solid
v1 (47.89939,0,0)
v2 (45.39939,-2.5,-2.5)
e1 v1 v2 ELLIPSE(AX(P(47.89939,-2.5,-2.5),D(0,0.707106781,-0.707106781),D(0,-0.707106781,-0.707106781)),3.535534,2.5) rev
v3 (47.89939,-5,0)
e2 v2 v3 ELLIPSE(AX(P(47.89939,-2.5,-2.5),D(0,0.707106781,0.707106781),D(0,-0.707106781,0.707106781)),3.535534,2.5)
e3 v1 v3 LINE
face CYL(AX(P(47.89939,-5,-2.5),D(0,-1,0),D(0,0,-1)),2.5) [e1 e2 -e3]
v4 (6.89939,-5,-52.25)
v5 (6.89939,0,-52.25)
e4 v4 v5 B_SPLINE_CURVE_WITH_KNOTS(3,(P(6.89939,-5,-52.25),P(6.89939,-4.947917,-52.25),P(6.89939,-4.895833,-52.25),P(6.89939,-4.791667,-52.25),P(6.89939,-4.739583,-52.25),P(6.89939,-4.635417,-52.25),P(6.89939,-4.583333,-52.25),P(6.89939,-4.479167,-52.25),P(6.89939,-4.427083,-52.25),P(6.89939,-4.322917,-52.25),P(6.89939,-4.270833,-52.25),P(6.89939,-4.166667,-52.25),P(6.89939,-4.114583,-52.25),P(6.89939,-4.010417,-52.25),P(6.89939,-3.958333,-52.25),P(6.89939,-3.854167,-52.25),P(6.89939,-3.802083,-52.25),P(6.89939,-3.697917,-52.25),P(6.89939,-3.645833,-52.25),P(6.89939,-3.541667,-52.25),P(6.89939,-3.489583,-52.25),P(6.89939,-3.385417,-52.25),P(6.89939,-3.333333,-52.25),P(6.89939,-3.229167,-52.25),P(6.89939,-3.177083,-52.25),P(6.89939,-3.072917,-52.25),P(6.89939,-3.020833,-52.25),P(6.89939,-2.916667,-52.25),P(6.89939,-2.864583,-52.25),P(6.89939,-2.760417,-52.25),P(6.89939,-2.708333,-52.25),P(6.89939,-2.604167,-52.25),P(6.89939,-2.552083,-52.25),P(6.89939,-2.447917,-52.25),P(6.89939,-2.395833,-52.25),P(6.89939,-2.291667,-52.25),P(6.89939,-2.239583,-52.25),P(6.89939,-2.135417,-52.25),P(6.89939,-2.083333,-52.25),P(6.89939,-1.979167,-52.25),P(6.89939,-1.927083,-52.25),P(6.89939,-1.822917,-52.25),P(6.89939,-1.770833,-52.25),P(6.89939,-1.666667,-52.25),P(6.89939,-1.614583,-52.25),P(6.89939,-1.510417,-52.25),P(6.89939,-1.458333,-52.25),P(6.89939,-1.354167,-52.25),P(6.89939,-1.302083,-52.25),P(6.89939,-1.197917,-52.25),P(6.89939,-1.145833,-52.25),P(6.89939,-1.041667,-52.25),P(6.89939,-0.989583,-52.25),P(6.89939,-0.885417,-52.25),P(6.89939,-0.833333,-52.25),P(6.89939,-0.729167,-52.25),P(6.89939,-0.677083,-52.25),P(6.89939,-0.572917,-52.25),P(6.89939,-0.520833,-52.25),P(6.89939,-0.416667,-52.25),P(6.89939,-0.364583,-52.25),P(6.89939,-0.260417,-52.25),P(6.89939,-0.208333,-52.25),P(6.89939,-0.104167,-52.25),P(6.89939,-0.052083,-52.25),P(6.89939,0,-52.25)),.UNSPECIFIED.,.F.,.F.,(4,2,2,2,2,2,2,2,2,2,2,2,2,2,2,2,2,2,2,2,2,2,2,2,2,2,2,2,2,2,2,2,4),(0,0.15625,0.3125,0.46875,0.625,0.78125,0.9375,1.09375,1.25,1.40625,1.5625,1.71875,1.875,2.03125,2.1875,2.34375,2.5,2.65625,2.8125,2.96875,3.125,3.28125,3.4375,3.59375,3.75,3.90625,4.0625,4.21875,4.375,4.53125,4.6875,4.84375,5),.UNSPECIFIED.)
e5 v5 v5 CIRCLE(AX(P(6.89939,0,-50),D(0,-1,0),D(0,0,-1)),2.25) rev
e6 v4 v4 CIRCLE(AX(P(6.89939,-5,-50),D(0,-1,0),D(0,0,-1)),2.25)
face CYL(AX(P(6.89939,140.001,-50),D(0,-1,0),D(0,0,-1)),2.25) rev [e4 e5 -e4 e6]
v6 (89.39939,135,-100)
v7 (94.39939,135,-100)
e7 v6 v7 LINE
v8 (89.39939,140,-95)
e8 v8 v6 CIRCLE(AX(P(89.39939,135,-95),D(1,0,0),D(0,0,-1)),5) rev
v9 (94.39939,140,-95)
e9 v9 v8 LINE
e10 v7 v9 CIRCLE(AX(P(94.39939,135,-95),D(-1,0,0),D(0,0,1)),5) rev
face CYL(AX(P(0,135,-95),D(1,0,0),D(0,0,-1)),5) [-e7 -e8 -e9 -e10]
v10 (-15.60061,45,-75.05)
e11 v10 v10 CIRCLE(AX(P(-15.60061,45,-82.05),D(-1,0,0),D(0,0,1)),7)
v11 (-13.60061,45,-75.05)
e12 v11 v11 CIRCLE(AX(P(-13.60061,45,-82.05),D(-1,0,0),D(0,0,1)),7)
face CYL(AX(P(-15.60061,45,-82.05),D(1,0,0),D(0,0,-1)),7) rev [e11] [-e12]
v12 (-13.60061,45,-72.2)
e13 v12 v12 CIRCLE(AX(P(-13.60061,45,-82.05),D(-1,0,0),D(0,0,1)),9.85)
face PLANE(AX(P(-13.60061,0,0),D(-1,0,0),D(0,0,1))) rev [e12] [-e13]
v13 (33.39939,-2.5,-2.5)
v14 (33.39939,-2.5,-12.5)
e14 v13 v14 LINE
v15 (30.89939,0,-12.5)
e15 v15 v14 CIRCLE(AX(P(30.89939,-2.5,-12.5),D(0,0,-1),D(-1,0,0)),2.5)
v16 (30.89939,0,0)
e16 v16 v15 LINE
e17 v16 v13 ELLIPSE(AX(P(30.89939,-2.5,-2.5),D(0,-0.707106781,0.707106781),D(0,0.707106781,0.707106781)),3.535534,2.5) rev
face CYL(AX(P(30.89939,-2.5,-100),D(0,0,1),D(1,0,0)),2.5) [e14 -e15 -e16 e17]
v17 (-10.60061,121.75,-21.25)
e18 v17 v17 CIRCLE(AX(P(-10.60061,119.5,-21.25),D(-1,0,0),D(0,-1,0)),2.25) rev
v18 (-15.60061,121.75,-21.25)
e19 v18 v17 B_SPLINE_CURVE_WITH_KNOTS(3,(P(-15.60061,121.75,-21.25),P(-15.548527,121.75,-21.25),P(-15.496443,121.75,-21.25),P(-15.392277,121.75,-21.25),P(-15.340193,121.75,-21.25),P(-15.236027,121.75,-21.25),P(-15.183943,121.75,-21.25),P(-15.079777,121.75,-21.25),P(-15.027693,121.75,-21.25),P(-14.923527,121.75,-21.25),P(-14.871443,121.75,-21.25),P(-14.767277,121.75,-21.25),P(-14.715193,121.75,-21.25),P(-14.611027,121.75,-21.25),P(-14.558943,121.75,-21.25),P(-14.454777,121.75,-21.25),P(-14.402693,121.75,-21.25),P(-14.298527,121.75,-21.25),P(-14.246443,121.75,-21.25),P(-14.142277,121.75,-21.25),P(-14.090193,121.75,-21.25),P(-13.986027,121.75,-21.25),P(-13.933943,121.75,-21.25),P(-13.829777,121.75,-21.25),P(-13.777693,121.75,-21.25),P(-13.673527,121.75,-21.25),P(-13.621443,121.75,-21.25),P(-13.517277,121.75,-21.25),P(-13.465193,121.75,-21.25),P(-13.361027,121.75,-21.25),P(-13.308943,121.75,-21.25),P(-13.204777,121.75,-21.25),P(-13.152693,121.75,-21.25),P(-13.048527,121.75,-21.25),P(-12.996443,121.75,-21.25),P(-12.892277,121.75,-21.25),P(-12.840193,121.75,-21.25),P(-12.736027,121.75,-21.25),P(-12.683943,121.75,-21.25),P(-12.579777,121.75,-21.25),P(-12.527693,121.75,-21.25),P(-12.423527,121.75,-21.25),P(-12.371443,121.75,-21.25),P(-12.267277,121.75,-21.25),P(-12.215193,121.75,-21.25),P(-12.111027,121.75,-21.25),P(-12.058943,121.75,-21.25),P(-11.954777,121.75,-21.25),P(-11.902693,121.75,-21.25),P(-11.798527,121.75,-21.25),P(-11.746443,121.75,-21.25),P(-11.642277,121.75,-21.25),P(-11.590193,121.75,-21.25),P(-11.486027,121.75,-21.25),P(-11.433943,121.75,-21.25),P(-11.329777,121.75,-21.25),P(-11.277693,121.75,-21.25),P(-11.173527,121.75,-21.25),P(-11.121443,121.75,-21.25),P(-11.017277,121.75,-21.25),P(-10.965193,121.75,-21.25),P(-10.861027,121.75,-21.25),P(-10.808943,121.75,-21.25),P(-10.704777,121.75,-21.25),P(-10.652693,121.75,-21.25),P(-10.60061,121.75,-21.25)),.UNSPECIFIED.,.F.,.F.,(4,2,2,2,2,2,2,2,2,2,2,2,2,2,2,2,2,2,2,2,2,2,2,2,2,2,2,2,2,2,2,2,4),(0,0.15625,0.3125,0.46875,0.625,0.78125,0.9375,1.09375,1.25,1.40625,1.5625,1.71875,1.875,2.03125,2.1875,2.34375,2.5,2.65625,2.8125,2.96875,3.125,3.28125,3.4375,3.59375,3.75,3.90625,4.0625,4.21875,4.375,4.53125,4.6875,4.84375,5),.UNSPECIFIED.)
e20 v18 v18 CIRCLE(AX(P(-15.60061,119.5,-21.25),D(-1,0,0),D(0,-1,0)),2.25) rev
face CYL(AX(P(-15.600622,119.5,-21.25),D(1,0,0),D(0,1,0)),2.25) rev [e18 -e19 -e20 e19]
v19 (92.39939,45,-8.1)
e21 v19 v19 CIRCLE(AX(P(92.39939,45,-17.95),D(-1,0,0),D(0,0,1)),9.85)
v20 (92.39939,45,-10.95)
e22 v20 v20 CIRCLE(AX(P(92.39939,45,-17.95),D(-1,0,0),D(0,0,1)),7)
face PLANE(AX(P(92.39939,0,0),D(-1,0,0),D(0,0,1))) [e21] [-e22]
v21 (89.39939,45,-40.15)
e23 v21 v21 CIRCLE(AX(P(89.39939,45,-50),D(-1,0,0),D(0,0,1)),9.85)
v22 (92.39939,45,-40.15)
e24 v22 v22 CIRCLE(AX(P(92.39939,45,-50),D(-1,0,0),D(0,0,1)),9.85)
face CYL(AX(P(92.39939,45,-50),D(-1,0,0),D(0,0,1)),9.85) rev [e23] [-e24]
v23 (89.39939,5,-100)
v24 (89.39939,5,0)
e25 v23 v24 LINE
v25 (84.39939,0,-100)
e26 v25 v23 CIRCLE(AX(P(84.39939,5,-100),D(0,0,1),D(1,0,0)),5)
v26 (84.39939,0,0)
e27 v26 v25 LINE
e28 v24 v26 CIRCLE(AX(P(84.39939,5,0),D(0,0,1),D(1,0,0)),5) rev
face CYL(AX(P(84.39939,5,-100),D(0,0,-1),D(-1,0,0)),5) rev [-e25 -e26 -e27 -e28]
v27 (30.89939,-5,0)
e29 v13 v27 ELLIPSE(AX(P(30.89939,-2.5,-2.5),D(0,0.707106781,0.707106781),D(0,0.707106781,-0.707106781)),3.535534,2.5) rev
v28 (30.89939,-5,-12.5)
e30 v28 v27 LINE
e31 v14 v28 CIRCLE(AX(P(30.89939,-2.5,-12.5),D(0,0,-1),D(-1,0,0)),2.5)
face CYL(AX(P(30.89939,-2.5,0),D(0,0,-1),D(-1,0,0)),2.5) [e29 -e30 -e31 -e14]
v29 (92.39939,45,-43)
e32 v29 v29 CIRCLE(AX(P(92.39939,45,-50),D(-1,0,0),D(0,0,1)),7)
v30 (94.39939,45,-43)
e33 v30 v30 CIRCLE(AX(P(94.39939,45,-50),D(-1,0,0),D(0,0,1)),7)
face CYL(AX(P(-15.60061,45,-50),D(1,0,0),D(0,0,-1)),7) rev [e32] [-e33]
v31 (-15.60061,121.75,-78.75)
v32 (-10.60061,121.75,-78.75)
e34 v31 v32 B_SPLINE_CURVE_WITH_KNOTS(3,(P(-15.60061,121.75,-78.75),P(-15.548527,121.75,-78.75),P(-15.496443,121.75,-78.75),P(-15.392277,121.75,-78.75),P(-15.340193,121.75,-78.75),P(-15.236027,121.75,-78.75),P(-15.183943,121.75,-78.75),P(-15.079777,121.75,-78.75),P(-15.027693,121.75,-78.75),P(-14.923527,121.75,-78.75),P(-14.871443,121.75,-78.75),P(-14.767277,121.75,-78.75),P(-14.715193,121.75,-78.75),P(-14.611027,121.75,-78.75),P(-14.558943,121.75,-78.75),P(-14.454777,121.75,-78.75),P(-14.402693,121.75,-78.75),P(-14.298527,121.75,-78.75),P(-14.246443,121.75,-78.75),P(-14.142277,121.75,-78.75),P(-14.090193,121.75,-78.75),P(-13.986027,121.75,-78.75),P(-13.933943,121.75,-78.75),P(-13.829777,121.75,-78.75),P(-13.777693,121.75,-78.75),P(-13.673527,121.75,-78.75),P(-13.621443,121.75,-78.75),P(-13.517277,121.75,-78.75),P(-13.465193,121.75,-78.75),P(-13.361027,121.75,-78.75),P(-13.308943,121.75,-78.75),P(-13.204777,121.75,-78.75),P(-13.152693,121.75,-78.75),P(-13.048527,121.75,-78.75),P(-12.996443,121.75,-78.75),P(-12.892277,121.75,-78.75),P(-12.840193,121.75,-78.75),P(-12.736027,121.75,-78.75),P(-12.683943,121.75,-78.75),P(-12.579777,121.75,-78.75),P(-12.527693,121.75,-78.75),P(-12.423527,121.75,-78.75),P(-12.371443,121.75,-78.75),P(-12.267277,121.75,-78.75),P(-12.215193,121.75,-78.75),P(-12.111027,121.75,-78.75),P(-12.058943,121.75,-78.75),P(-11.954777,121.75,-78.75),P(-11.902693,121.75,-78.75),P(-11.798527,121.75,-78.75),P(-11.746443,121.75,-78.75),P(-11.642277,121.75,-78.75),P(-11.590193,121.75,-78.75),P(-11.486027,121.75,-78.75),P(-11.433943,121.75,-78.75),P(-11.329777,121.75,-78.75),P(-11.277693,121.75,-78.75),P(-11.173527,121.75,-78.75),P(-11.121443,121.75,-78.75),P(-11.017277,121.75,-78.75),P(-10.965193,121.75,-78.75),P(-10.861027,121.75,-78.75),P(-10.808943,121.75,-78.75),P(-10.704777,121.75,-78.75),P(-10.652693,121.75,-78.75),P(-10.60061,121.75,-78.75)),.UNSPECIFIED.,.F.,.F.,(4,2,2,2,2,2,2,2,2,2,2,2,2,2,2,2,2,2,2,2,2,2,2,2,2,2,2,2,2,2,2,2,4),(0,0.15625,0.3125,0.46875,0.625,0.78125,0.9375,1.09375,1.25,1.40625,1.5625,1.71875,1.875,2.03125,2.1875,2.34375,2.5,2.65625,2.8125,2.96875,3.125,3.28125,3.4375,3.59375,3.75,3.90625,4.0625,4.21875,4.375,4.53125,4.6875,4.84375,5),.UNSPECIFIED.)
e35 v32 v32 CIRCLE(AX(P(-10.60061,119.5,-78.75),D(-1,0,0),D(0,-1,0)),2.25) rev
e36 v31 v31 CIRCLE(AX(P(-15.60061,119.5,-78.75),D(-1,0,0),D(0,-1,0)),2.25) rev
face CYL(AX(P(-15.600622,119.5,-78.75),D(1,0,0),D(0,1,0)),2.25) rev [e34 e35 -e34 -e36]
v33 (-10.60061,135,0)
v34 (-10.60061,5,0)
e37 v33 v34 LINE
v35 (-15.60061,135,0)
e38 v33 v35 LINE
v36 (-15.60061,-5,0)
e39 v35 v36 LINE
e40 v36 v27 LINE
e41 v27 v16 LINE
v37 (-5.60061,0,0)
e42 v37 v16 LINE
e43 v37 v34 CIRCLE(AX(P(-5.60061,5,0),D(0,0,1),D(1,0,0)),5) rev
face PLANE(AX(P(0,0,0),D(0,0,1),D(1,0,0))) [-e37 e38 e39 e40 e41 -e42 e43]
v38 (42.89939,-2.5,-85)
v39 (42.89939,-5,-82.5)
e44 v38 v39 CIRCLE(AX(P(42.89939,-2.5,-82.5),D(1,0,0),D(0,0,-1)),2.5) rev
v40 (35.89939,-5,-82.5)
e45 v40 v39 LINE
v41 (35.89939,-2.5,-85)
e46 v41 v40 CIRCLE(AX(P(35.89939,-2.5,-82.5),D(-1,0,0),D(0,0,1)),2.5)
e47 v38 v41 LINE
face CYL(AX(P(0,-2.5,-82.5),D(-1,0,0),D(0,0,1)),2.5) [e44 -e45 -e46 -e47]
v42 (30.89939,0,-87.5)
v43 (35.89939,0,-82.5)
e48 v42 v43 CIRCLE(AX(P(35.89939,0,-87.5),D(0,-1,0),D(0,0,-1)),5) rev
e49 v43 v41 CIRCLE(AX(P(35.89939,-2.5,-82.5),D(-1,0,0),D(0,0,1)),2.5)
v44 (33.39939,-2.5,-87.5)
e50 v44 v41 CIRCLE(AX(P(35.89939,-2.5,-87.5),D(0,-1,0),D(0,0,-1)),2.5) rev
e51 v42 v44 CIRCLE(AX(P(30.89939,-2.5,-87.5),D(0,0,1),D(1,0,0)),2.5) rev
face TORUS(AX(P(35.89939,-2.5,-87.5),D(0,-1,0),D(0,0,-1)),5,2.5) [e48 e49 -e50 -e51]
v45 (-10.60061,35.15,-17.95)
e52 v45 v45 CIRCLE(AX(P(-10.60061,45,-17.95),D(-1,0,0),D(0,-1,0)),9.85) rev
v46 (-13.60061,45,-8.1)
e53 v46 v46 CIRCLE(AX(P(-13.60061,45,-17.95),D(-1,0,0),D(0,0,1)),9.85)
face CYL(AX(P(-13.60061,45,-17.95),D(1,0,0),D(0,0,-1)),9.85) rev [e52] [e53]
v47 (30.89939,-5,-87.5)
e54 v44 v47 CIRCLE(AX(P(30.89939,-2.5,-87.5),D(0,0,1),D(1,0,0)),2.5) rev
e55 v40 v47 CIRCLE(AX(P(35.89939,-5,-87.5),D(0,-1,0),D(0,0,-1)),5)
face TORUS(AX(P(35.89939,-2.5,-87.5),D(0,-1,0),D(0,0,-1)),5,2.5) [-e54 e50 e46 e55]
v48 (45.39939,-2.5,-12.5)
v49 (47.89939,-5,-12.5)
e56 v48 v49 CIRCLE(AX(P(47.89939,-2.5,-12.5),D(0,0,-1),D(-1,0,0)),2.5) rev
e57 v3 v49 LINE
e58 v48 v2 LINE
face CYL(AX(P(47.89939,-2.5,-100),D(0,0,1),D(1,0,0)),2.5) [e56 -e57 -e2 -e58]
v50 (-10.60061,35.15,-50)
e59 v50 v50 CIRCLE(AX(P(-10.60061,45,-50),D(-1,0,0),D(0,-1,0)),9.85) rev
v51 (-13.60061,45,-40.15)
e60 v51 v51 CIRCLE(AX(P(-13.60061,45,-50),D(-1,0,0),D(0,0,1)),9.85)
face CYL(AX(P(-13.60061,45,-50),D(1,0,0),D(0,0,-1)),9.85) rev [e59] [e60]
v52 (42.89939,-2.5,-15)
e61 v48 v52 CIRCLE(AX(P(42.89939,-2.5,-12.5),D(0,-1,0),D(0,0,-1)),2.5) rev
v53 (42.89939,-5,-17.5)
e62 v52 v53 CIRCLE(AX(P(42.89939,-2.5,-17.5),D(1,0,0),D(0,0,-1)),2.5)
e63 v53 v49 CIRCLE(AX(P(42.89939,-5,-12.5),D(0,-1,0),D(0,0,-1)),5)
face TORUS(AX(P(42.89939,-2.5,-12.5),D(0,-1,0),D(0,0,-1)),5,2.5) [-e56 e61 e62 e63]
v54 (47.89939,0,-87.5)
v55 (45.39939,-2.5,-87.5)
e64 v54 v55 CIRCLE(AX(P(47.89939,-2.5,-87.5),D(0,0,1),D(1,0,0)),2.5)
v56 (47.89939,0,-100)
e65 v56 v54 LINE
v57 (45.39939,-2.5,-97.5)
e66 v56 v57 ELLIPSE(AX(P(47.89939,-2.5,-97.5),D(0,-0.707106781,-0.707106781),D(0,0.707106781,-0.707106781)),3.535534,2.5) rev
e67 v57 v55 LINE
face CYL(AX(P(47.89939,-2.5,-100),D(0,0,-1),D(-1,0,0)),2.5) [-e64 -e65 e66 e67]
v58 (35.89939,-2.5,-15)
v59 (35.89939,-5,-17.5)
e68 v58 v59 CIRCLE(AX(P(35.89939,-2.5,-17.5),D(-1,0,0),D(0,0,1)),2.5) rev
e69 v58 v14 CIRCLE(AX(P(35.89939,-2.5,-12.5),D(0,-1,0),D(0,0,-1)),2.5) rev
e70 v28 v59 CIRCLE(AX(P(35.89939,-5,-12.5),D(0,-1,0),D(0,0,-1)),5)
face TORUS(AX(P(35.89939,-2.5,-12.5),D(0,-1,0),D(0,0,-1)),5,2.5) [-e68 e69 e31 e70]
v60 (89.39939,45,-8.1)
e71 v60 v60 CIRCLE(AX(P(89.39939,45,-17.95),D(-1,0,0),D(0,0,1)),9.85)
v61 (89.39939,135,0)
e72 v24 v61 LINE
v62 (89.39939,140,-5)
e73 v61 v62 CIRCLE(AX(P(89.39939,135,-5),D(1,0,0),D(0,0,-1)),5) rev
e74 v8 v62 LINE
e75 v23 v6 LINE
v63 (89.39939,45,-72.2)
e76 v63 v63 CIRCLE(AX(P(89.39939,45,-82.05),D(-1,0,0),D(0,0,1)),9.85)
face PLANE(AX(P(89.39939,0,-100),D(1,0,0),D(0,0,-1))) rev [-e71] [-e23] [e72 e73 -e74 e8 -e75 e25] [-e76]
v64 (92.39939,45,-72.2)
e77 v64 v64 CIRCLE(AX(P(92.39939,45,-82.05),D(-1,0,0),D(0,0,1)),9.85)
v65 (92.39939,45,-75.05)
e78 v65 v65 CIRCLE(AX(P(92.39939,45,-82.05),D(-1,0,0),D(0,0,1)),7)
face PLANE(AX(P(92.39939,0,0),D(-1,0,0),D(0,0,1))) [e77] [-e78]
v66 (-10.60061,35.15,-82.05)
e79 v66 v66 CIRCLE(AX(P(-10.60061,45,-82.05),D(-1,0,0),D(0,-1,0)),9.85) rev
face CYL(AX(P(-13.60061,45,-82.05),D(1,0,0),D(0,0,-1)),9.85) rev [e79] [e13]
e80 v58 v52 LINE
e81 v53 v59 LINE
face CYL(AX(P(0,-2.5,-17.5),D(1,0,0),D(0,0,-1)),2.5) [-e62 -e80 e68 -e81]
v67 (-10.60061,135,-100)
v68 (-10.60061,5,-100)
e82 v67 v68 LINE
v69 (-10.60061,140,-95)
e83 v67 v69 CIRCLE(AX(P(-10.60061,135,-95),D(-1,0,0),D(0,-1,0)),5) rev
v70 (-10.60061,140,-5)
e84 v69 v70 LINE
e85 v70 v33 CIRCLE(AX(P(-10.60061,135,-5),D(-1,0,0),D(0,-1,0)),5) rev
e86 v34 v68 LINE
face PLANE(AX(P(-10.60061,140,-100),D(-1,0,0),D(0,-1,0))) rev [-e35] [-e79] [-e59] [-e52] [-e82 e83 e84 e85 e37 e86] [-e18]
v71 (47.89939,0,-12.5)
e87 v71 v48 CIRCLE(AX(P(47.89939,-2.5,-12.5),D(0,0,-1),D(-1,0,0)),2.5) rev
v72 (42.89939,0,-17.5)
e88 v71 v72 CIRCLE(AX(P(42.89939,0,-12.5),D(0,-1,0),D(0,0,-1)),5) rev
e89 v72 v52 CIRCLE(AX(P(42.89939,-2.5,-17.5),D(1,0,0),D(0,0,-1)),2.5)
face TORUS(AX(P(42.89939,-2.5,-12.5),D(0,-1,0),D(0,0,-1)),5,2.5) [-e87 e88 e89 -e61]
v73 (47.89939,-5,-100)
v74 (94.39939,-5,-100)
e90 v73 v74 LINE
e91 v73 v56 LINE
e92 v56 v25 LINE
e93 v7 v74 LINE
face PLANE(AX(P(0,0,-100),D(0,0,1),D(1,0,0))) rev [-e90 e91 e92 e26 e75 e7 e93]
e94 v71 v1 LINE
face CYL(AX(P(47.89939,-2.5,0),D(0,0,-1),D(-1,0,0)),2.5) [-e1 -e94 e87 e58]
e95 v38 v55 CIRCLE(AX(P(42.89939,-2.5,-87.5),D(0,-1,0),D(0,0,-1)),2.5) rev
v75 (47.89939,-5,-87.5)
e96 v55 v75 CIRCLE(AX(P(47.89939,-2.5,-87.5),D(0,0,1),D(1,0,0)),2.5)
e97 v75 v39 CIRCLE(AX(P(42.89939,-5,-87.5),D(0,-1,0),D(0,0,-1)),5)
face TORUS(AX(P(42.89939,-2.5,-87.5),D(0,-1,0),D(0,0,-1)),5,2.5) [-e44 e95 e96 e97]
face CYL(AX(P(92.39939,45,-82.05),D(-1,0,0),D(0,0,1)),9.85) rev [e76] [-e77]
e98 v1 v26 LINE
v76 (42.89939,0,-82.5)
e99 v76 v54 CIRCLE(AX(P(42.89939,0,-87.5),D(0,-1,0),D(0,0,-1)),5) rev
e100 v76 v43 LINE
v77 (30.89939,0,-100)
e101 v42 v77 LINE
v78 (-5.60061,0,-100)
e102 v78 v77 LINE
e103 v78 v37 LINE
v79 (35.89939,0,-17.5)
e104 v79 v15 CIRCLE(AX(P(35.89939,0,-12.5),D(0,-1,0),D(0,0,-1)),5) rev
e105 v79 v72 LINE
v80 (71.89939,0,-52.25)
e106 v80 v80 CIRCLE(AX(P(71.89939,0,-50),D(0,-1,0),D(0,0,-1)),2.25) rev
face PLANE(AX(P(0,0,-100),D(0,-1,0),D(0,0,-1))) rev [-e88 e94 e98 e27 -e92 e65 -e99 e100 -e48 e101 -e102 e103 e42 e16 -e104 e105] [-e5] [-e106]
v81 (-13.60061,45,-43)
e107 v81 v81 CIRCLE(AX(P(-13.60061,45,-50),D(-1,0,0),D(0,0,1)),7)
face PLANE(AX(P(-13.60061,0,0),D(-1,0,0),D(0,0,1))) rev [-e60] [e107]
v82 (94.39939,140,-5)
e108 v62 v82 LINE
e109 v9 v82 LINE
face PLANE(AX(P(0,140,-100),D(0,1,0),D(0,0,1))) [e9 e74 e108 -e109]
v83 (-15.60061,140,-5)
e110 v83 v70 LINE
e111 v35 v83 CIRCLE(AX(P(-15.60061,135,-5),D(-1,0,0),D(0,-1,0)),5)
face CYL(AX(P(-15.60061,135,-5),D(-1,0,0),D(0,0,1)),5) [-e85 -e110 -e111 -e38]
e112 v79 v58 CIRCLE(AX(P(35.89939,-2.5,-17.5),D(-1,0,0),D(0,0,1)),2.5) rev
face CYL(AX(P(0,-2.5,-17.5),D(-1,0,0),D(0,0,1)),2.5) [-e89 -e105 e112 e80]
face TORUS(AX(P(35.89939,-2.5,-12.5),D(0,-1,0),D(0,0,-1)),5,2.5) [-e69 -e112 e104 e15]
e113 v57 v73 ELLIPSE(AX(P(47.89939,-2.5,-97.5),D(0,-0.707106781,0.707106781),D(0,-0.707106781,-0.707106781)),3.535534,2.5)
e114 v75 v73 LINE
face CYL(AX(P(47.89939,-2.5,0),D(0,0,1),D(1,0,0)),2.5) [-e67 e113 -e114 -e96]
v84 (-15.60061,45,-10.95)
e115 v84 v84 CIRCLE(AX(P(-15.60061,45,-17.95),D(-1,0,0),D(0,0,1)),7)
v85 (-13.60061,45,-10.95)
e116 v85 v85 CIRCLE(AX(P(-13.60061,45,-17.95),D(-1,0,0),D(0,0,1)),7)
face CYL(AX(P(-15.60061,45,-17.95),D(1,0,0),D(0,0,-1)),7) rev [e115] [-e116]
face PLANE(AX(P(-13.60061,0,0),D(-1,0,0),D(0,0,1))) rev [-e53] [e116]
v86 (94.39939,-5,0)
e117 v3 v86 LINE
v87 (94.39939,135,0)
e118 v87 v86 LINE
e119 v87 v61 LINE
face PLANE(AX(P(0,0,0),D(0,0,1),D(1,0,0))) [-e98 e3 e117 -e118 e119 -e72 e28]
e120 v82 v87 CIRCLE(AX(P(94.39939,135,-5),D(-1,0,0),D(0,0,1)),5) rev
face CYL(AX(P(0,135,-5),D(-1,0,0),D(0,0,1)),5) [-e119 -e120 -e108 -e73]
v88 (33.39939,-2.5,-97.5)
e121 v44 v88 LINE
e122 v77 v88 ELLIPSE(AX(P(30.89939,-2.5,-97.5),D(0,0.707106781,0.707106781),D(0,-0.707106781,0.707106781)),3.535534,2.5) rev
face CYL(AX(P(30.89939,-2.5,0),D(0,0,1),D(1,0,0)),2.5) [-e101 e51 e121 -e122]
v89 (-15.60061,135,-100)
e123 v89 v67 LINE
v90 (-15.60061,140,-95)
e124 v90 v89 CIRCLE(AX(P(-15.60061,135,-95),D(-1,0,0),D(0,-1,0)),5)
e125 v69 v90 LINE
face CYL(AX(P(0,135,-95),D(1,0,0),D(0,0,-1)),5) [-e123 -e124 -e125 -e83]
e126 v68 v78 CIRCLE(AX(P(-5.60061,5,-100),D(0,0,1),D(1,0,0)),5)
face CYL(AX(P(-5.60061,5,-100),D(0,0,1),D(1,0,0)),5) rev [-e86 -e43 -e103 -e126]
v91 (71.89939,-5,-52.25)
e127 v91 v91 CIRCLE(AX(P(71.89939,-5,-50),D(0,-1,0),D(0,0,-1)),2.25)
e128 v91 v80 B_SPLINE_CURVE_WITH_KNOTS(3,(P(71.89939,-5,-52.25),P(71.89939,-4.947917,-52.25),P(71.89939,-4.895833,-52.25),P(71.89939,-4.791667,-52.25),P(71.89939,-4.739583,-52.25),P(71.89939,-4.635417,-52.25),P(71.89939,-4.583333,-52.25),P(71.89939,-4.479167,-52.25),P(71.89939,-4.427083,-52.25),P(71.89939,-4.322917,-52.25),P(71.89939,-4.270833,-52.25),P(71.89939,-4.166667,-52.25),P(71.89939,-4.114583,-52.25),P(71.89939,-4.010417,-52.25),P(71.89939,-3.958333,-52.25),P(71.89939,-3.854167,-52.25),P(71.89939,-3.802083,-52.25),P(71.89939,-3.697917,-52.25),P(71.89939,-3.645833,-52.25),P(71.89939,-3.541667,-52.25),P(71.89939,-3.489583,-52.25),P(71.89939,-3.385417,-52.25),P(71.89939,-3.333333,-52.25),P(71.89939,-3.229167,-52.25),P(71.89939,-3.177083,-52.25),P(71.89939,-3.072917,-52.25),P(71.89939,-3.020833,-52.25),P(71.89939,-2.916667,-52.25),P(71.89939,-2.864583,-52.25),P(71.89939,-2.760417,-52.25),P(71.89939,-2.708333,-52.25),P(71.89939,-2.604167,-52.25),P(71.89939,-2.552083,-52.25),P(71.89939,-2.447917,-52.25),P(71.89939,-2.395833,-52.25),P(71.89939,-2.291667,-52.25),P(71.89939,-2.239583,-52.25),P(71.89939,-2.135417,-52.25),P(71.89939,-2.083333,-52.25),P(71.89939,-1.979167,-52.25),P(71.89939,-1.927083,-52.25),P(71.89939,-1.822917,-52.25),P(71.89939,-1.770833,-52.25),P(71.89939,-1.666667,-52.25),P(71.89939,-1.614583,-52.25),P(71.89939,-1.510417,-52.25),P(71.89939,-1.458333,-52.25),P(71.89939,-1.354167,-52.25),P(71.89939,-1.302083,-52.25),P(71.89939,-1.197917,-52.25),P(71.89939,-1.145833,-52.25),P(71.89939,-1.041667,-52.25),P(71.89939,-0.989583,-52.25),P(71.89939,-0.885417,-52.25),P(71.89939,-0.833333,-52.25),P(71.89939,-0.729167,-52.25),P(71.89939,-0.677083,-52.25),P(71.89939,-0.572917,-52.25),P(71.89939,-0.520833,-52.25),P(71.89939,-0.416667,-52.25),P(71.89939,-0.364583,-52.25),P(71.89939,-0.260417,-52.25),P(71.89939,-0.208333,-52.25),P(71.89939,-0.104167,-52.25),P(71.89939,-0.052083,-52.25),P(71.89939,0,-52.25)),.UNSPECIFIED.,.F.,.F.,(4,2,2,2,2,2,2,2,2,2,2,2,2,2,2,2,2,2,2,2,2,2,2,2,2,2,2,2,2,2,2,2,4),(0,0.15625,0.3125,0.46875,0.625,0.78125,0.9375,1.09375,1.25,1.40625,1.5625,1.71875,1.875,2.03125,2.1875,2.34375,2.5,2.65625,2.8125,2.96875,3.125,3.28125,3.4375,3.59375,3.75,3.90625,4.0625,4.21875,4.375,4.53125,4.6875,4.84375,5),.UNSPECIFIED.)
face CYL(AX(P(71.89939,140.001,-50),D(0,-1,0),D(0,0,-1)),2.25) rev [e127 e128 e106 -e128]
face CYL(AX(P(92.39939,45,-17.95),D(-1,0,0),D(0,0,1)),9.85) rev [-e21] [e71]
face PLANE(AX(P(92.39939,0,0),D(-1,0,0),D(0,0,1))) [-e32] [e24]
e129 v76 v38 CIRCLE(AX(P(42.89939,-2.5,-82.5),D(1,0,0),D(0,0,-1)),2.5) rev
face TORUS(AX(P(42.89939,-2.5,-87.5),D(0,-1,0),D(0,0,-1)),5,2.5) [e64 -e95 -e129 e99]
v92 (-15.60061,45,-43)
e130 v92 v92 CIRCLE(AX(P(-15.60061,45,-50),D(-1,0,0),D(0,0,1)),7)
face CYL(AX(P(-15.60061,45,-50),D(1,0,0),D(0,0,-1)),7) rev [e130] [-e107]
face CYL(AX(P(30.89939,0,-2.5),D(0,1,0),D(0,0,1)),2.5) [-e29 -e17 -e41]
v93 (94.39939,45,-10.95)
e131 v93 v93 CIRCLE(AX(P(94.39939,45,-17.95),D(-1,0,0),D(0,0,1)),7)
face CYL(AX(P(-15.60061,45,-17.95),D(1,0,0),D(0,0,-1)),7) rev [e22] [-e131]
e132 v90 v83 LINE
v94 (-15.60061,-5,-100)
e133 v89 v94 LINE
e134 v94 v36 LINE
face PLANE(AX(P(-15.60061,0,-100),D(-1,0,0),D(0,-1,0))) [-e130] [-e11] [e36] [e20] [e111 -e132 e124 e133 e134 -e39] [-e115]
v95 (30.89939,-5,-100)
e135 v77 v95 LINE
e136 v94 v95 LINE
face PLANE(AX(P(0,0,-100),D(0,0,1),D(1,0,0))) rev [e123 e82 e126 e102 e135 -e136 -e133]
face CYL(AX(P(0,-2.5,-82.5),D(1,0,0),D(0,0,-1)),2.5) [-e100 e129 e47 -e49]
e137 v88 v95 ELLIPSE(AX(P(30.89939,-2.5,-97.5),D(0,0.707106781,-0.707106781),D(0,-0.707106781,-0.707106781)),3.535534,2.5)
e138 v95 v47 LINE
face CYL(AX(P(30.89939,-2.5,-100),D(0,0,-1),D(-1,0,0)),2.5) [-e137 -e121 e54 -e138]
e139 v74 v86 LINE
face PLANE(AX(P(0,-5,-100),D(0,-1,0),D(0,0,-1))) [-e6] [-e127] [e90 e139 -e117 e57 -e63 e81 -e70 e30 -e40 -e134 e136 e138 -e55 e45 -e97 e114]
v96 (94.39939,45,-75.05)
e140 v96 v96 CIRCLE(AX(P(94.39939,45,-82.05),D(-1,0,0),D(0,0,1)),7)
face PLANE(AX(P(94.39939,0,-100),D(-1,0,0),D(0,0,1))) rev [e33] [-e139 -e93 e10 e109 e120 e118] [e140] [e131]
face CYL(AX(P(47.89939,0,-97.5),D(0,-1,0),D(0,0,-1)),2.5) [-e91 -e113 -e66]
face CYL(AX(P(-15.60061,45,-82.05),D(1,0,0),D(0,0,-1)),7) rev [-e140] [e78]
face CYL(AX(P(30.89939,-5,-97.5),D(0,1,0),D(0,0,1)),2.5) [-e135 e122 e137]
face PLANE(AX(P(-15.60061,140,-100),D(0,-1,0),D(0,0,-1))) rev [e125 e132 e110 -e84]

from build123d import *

# Parameters (mm, degrees)
SKETCH1_W                      = 5
SKETCH1_H                      = 140
BOSS_EXTRUDE1_DEPTH            = 100
CUT_EXTRUDE3_DEPTH             = 202.556443707
CUT_EXTRUDE3_DEPTH_BACK        = 202.556443707
SKETCH4_4_R                    = 9.85
CUT_EXTRUDE4_DEPTH             = 3
CUT_EXTRUDE5_START             = 103
SKETCH4_6_R                    = 9.85
CUT_EXTRUDE5_DEPTH             = 103
CUT_EXTRUDE6_REACH             = 206.206
SKETCH5_R                      = 2.25
CUT_EXTRUDE6_DIRECTION_2_DEPTH = 205.205778567
CUT_EXTRUDE7_REACH             = 201.841
SKETCH6_R                      = 2.25
SKETCH7_W                      = 12
SKETCH7_H                      = 15
CUT_EXTRUDE8_DEPTH             = 197.242821038
FILLET3_R                      = 2.5
FILLET4_R                      = 2.5
FILLET5_R                      = 5
FILLET6_R                      = 5


with BuildPart() as part:
    # Sketch1 → Boss-Extrude1 (new body)
    with BuildSketch(Plane.XY):
        with Locations((-13.100610125, 70)):
            Rectangle(SKETCH1_W, SKETCH1_H)
        Polygon((-10.600610125, 0), (-15.600610125, 0), (-15.600610125, -5), (94.399389875, -5), (94.399389875, 0), (89.399389875, 0), align=None)
        with Locations((91.899389875, 70)):
            Rectangle(SKETCH1_W, SKETCH1_H)
    extrude(amount=-BOSS_EXTRUDE1_DEPTH)

    # Sketch4 → Cut-Extrude3 (cut, two sides: drawn at the far end of the back side and taken through both)
    with BuildSketch(Plane.ZY.offset(-89.399389875).offset(-CUT_EXTRUDE3_DEPTH_BACK)):
        with BuildLine():
            ThreePointArc((-89.05, 45), (-82.05, 38), (-75.05, 45))
            Line((-75.05, 45), (-82.05, 45))
            Line((-82.05, 45), (-89.05, 45))
        make_face()
        with BuildLine():
            Line((-82.05, 45), (-75.05, 45))
            ThreePointArc((-75.05, 45), (-82.05, 52), (-89.05, 45))
            Line((-89.05, 45), (-82.05, 45))
        make_face()
        with BuildLine():
            ThreePointArc((-57, 45), (-50, 38), (-43, 45))
            Line((-43, 45), (-50, 45))
            Line((-50, 45), (-57, 45))
        make_face()
        with BuildLine():
            Line((-50, 45), (-43, 45))
            ThreePointArc((-43, 45), (-50, 52), (-57, 45))
            Line((-57, 45), (-50, 45))
        make_face()
        with BuildLine():
            ThreePointArc((-24.95, 45), (-17.95, 38), (-10.95, 45))
            Line((-10.95, 45), (-17.95, 45))
            Line((-17.95, 45), (-24.95, 45))
        make_face()
        with BuildLine():
            Line((-17.95, 45), (-10.95, 45))
            ThreePointArc((-10.95, 45), (-17.95, 52), (-24.95, 45))
            Line((-24.95, 45), (-17.95, 45))
        make_face()
    extrude(amount=CUT_EXTRUDE3_DEPTH + CUT_EXTRUDE3_DEPTH_BACK, mode=Mode.SUBTRACT)

    # Sketch4<4> → Cut-Extrude4 (cut)
    with BuildSketch(Plane.ZY.offset(-89.399389875)):
        with Locations((-50, 45)):
            Circle(SKETCH4_4_R)
        with Locations((-82.05, 45)):
            Circle(SKETCH4_4_R)
        with Locations((-17.95, 45)):
            Circle(SKETCH4_4_R)
    extrude(amount=-CUT_EXTRUDE4_DEPTH, mode=Mode.SUBTRACT)

    # Sketch4<6> → Cut-Extrude5 (cut)
    with BuildSketch(Plane.ZY.offset(-89.399389875).offset(CUT_EXTRUDE5_START)):
        with Locations((-50, 45)):
            Circle(SKETCH4_6_R)
        with Locations((-82.05, 45)):
            Circle(SKETCH4_6_R)
        with Locations((-17.95, 45)):
            Circle(SKETCH4_6_R)
    extrude(amount=-CUT_EXTRUDE5_DEPTH, mode=Mode.SUBTRACT)

    # Sketch5 → Cut-Extrude6 (cut, up to next)
    with BuildSketch(Plane.ZY.offset(15.600610125), mode=Mode.PRIVATE) as cut_extrude6_sk1:
        with Locations(Location((-78.75, 119.5, 0), (0, 0, 90))):
            Circle(SKETCH5_R)
    cut_extrude6_tool1 = extrude(cut_extrude6_sk1.sketch, amount=-CUT_EXTRUDE6_REACH, mode=Mode.PRIVATE) & part.part
    # Sketch5 → Cut-Extrude6 (cut, up to next)
    with BuildSketch(Plane.ZY.offset(15.600610125), mode=Mode.PRIVATE) as cut_extrude6_sk2:
        with Locations(Location((-21.25, 119.5, 0), (0, 0, 90))):
            Circle(SKETCH5_R)
    cut_extrude6_tool2 = extrude(cut_extrude6_sk2.sketch, amount=-CUT_EXTRUDE6_REACH, mode=Mode.PRIVATE) & part.part
    add(cut_extrude6_tool1.solids().sort_by_distance((-15.60061, 119.5, -78.75))[0], mode=Mode.SUBTRACT)
    add(cut_extrude6_tool2.solids().sort_by_distance((-15.60061, 119.5, -21.25))[0], mode=Mode.SUBTRACT)

    # Sketch5 → Cut-Extrude6 direction 2 (cut)
    with BuildSketch(Plane.ZY.offset(15.600610125)):
        with Locations(Location((-78.75, 119.5, 0), (0, 0, 90))):
            Circle(SKETCH5_R)
        with Locations(Location((-21.25, 119.5, 0), (0, 0, 90))):
            Circle(SKETCH5_R)
    extrude(amount=CUT_EXTRUDE6_DIRECTION_2_DEPTH, mode=Mode.SUBTRACT)

    # Sketch6 → Cut-Extrude7 (cut, up to next)
    with BuildSketch(Plane.XZ.offset(5), mode=Mode.PRIVATE) as cut_extrude7_sk1:
        with Locations(Location((71.899389875, -50, 0), (0, 0, 270))):
            Circle(SKETCH6_R)
    cut_extrude7_tool1 = extrude(cut_extrude7_sk1.sketch, amount=-CUT_EXTRUDE7_REACH, mode=Mode.PRIVATE) & part.part
    # Sketch6 → Cut-Extrude7 (cut, up to next)
    with BuildSketch(Plane.XZ.offset(5), mode=Mode.PRIVATE) as cut_extrude7_sk2:
        with Locations(Location((6.899389875, -50, 0), (0, 0, 270))):
            Circle(SKETCH6_R)
    cut_extrude7_tool2 = extrude(cut_extrude7_sk2.sketch, amount=-CUT_EXTRUDE7_REACH, mode=Mode.PRIVATE) & part.part
    add(cut_extrude7_tool1.solids().sort_by_distance((71.89939, -5, -50))[0], mode=Mode.SUBTRACT)
    add(cut_extrude7_tool2.solids().sort_by_distance((6.89939, -5, -50))[0], mode=Mode.SUBTRACT)

    # Sketch7 → Cut-Extrude8 (cut, through all)
    with BuildSketch(Plane(origin=(0, 0, 0), x_dir=(1, 0, 0), z_dir=(0, 1, 0))):
        Polygon((45.399389875, 100), (39.399389875, 100), (33.399389875, 100), (33.399389875, 85), (45.399389875, 85), align=None)
        with Locations((39.399389875, 7.5)):
            Rectangle(SKETCH7_W, SKETCH7_H)
    extrude(amount=-CUT_EXTRUDE8_DEPTH, mode=Mode.SUBTRACT)

    # Fillet3
    fillet3_edges = [part.edges().sort_by_distance(p)[0] for p in [
        (33.399389875, 0, -7.5),
        (33.399389875, -2.5, 0),
        (39.399389875, 0, -15),
        (33.399389875, -2.5, -15),
        (45.399389875, -5, -7.5),
        (45.399389875, -2.5, -15),
        (45.399389875, -2.5, 0),
        (33.399389875, -5, -7.5),
        (39.399389875, -5, -15),
        (45.399389875, 0, -7.5),
    ]]
    fillet(fillet3_edges, radius=FILLET3_R - 0.0001)  # a hair under: the kernel refuses the full size

    # Fillet4
    fillet4_edges = [part.edges().sort_by_distance(p)[0] for p in [
        (45.399389875, 0, -92.5),
        (45.399389875, -2.5, -100),
        (39.399389875, -5, -85),
        (45.399389875, -2.5, -85),
        (33.399389875, -5, -92.5),
        (33.399389875, -2.5, -85),
        (33.399389875, -2.5, -100),
        (45.399389875, -5, -92.5),
        (33.399389875, 0, -92.5),
        (39.399389875, 0, -85),
    ]]
    fillet(fillet4_edges, radius=FILLET4_R - 0.0001)  # a hair under: the kernel refuses the full size

    # Fillet5
    fillet5_edges = [part.edges().sort_by_distance(p)[0] for p in [
        (89.399389875, 0, -50),
        (-10.600610125, 0, -50),
    ]]
    fillet(fillet5_edges, radius=FILLET5_R)

    # Fillet6
    fillet6_edges = [part.edges().sort_by_distance(p)[0] for p in [
        (91.899389875, 140, -100),
        (-13.100610125, 140, -100),
        (-13.100610125, 140, 0),
        (91.899389875, 140, 0),
    ]]
    fillet(fillet6_edges, radius=FILLET6_R)


solid = part.part
